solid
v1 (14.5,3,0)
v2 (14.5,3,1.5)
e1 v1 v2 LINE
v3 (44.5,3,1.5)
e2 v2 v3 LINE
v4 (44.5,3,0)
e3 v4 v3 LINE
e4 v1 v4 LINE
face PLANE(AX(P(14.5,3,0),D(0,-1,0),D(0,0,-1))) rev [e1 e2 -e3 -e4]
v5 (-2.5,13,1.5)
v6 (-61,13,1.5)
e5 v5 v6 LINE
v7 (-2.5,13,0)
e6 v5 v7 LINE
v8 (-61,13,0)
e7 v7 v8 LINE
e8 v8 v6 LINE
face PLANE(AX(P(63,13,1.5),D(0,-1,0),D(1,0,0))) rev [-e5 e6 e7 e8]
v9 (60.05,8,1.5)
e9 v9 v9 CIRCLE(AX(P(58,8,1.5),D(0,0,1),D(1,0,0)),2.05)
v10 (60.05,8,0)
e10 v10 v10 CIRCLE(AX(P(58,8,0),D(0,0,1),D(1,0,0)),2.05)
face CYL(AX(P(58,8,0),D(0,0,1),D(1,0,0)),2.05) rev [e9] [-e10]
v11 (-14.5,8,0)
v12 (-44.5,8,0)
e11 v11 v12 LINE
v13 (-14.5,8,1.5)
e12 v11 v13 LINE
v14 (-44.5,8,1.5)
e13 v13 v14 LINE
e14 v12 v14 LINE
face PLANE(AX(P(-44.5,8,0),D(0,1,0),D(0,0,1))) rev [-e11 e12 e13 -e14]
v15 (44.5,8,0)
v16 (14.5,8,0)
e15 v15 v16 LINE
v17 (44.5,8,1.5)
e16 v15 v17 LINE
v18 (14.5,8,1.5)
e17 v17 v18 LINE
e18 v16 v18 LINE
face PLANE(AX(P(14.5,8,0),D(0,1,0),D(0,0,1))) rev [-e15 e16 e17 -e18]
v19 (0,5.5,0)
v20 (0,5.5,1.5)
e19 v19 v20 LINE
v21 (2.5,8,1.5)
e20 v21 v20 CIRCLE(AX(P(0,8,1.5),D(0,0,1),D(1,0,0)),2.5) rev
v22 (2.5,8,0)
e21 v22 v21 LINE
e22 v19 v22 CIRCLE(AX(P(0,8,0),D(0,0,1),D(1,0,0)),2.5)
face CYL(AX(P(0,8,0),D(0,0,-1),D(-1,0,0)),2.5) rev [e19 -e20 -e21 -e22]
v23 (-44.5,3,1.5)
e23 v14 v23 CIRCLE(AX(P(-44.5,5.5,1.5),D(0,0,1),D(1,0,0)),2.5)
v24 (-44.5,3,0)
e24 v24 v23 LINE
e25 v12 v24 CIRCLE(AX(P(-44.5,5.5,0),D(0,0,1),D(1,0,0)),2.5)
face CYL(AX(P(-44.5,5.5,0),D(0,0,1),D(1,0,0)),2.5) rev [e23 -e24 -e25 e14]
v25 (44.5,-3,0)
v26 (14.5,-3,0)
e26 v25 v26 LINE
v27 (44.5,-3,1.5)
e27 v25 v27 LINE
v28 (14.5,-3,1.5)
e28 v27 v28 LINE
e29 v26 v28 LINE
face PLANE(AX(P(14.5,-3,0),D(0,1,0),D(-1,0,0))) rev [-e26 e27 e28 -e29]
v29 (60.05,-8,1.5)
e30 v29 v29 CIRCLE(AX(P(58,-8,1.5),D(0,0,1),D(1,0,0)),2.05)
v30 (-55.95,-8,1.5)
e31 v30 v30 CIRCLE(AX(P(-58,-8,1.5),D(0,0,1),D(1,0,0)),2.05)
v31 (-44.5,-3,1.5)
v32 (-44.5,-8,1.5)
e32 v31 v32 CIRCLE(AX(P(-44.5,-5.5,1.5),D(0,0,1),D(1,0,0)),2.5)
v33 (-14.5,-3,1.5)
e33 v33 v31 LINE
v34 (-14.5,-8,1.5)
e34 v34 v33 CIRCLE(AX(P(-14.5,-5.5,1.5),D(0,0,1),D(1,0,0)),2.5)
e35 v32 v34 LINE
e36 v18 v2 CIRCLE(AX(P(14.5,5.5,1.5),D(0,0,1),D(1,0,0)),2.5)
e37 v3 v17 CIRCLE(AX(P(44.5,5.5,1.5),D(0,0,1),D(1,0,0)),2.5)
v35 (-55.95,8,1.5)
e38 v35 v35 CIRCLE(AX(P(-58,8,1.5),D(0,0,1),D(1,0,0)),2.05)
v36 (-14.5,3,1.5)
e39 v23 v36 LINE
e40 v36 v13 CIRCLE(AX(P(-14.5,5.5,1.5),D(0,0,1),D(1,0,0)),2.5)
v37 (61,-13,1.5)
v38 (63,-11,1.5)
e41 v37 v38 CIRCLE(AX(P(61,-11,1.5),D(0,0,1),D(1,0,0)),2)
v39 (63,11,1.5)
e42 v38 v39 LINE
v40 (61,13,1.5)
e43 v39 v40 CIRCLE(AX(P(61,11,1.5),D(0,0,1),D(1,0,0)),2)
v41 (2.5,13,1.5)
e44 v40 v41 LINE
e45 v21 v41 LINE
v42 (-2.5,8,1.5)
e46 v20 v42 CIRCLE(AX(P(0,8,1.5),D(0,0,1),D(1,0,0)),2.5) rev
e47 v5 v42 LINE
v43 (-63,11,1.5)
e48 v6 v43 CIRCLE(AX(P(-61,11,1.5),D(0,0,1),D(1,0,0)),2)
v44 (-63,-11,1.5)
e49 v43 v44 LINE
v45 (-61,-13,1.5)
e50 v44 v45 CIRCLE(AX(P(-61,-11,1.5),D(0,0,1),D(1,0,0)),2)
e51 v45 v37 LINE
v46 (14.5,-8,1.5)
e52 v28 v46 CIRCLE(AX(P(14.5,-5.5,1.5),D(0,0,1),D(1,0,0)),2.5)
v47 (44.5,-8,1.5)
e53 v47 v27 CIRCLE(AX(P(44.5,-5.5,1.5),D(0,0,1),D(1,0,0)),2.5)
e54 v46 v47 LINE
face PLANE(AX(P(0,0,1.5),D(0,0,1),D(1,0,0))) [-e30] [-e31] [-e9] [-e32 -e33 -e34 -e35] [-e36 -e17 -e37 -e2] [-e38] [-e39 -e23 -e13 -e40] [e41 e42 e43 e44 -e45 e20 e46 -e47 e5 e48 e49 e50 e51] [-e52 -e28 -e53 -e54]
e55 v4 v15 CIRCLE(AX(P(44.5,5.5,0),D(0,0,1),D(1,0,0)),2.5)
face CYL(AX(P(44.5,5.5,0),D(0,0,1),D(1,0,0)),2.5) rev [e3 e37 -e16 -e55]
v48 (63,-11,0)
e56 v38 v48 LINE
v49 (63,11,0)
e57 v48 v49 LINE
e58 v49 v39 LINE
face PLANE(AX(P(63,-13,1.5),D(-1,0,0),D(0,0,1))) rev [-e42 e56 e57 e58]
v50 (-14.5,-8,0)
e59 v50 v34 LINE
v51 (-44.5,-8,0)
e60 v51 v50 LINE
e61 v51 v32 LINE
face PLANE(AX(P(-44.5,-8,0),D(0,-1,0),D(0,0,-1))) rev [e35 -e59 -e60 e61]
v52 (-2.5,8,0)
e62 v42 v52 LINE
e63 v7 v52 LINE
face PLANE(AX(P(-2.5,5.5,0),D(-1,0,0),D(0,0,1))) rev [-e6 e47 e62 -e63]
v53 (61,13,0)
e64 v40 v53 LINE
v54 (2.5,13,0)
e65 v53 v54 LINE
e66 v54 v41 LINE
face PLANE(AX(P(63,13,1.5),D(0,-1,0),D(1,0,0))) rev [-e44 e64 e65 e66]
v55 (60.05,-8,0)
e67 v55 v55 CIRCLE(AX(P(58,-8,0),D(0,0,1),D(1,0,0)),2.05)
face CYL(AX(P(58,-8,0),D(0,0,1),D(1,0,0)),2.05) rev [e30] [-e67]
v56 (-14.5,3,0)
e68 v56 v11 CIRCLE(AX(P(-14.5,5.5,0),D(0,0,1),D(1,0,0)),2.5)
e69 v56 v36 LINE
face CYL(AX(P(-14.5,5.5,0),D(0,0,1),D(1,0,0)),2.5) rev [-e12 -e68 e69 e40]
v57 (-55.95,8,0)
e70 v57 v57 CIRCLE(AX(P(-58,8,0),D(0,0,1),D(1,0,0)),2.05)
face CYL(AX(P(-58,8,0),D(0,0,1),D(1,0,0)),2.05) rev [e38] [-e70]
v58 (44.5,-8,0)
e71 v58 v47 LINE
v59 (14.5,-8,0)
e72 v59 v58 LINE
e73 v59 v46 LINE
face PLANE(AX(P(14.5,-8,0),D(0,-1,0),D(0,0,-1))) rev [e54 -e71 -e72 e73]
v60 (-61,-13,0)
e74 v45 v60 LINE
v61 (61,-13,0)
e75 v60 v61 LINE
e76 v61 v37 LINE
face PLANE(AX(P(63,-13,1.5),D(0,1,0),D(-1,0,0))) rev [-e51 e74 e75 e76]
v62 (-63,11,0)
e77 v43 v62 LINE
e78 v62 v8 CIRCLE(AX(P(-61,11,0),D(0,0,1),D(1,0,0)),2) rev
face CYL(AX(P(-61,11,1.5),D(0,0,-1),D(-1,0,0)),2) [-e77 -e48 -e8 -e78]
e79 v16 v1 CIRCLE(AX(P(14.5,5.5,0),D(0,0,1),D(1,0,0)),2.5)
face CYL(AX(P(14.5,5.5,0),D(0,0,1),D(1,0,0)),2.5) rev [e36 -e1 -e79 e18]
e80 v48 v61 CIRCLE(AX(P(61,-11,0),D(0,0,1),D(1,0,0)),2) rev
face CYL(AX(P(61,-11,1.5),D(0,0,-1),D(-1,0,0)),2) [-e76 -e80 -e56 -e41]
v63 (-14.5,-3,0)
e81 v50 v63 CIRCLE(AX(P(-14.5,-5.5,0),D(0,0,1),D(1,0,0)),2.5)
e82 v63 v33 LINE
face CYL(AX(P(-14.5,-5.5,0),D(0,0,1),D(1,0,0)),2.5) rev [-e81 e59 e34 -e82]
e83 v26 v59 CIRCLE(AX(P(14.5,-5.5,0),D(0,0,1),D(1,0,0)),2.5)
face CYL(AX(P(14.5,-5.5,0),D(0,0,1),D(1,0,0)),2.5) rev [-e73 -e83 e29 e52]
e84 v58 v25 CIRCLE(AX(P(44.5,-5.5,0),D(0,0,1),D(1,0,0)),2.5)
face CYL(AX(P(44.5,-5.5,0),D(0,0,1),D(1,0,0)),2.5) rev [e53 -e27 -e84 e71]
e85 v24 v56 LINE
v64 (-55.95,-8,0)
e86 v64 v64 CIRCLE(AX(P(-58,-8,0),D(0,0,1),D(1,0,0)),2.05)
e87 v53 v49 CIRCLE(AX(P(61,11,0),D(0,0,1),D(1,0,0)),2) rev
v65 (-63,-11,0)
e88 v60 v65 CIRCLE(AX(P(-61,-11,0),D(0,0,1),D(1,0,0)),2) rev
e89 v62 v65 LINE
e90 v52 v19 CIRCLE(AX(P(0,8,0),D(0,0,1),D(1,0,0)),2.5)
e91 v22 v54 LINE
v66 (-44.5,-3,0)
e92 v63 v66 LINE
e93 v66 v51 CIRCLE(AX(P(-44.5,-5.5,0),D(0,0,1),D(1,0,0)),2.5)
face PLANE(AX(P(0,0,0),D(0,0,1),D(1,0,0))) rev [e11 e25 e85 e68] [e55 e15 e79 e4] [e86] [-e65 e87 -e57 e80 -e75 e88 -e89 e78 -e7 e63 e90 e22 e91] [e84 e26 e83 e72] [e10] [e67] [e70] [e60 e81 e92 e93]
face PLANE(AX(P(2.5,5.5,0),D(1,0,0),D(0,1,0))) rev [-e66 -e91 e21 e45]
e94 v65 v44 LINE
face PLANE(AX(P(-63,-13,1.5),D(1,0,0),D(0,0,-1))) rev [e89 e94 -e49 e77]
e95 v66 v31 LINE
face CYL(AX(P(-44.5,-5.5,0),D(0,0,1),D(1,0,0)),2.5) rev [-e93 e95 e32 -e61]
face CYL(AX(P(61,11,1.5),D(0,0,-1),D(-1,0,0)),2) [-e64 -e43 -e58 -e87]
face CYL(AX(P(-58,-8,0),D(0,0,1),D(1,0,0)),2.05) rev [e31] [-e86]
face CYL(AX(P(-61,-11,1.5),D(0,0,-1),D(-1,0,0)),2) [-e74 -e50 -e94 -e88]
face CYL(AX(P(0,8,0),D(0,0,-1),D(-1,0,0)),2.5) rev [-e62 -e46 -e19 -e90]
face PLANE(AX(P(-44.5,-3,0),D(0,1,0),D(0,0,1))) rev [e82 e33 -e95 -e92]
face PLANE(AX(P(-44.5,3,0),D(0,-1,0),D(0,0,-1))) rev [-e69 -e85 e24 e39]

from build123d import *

# Parameters (mm, degrees)
SKETCH_1_W          = 126
SKETCH_1_H          = 26
EXTRUDE_1_DEPTH     = 1.5
FILLET_1_R          = 2
SKETCH_2_W          = 5
SKETCH_2_H          = 15
CUT_EXTRUDE_1_DEPTH = 65.344774458
FILLET_2_R          = 2.5
CUT_EXTRUDE_2_DEPTH = 65.344774458
SKETCH_4_R          = 2.05
CUT_EXTRUDE_3_DEPTH = 65.344774458


with BuildPart() as part:
    # 草图1 → 凸台-拉伸1 (new body)
    with BuildSketch(Plane.XY):
        Rectangle(SKETCH_1_W, SKETCH_1_H)
    extrude(amount=EXTRUDE_1_DEPTH)

    # 圆角1
    fillet_1_edges = [part.edges().sort_by_distance(p)[0] for p in [
        (-63, 13, 0.75),
        (63, 13, 0.75),
        (63, -13, 0.75),
        (-63, -13, 0.75),
    ]]
    fillet(fillet_1_edges, radius=FILLET_1_R)

    # 草图2 → 切除-拉伸1 (cut, through all)
    with BuildSketch(Plane.XY.offset(1.5)):
        with Locations((0, 13)):
            Rectangle(SKETCH_2_W, SKETCH_2_H)
    extrude(amount=-CUT_EXTRUDE_1_DEPTH, mode=Mode.SUBTRACT)

    # 圆角2
    fillet_2_edges = [part.edges().sort_by_distance(p)[0] for p in [
        (2.5, 5.5, 0.75),
        (-2.5, 5.5, 0.75),
    ]]
    fillet(fillet_2_edges, radius=FILLET_2_R - 0.0001)  # a hair under: the kernel refuses the full size

    # 草图3 → 切除-拉伸2 (cut, through all)
    with BuildSketch(Plane.XY.offset(1.5)):
        with BuildLine():
            Line((-44.5, 8), (-14.5, 8))
            ThreePointArc((-14.5, 8), (-12, 5.5), (-14.5, 3))
            Line((-14.5, 3), (-44.5, 3))
            ThreePointArc((-44.5, 3), (-47, 5.5), (-44.5, 8))
        make_face()
        with BuildLine():
            Line((14.5, 8), (44.5, 8))
            ThreePointArc((44.5, 8), (47, 5.5), (44.5, 3))
            Line((44.5, 3), (14.5, 3))
            ThreePointArc((14.5, 3), (12, 5.5), (14.5, 8))
        make_face()
        with BuildLine():
            Line((14.5, -3), (44.5, -3))
            ThreePointArc((44.5, -3), (47, -5.5), (44.5, -8))
            Line((44.5, -8), (14.5, -8))
            ThreePointArc((14.5, -8), (12, -5.5), (14.5, -3))
        make_face()
        with BuildLine():
            Line((-44.5, -3), (-14.5, -3))
            ThreePointArc((-14.5, -3), (-12, -5.5), (-14.5, -8))
            Line((-14.5, -8), (-44.5, -8))
            ThreePointArc((-44.5, -8), (-47, -5.5), (-44.5, -3))
        make_face()
    extrude(amount=-CUT_EXTRUDE_2_DEPTH, mode=Mode.SUBTRACT)

    # 草图4 → 切除-拉伸3 (cut, through all)
    with BuildSketch(Plane.XY.offset(1.5)):
        with Locations((58, -8)):
            Circle(SKETCH_4_R)
        with Locations((58, 8)):
            Circle(SKETCH_4_R)
        with Locations((-58, 8)):
            Circle(SKETCH_4_R)
        with Locations((-58, -8)):
            Circle(SKETCH_4_R)
    extrude(amount=-CUT_EXTRUDE_3_DEPTH, mode=Mode.SUBTRACT)


solid = part.part
